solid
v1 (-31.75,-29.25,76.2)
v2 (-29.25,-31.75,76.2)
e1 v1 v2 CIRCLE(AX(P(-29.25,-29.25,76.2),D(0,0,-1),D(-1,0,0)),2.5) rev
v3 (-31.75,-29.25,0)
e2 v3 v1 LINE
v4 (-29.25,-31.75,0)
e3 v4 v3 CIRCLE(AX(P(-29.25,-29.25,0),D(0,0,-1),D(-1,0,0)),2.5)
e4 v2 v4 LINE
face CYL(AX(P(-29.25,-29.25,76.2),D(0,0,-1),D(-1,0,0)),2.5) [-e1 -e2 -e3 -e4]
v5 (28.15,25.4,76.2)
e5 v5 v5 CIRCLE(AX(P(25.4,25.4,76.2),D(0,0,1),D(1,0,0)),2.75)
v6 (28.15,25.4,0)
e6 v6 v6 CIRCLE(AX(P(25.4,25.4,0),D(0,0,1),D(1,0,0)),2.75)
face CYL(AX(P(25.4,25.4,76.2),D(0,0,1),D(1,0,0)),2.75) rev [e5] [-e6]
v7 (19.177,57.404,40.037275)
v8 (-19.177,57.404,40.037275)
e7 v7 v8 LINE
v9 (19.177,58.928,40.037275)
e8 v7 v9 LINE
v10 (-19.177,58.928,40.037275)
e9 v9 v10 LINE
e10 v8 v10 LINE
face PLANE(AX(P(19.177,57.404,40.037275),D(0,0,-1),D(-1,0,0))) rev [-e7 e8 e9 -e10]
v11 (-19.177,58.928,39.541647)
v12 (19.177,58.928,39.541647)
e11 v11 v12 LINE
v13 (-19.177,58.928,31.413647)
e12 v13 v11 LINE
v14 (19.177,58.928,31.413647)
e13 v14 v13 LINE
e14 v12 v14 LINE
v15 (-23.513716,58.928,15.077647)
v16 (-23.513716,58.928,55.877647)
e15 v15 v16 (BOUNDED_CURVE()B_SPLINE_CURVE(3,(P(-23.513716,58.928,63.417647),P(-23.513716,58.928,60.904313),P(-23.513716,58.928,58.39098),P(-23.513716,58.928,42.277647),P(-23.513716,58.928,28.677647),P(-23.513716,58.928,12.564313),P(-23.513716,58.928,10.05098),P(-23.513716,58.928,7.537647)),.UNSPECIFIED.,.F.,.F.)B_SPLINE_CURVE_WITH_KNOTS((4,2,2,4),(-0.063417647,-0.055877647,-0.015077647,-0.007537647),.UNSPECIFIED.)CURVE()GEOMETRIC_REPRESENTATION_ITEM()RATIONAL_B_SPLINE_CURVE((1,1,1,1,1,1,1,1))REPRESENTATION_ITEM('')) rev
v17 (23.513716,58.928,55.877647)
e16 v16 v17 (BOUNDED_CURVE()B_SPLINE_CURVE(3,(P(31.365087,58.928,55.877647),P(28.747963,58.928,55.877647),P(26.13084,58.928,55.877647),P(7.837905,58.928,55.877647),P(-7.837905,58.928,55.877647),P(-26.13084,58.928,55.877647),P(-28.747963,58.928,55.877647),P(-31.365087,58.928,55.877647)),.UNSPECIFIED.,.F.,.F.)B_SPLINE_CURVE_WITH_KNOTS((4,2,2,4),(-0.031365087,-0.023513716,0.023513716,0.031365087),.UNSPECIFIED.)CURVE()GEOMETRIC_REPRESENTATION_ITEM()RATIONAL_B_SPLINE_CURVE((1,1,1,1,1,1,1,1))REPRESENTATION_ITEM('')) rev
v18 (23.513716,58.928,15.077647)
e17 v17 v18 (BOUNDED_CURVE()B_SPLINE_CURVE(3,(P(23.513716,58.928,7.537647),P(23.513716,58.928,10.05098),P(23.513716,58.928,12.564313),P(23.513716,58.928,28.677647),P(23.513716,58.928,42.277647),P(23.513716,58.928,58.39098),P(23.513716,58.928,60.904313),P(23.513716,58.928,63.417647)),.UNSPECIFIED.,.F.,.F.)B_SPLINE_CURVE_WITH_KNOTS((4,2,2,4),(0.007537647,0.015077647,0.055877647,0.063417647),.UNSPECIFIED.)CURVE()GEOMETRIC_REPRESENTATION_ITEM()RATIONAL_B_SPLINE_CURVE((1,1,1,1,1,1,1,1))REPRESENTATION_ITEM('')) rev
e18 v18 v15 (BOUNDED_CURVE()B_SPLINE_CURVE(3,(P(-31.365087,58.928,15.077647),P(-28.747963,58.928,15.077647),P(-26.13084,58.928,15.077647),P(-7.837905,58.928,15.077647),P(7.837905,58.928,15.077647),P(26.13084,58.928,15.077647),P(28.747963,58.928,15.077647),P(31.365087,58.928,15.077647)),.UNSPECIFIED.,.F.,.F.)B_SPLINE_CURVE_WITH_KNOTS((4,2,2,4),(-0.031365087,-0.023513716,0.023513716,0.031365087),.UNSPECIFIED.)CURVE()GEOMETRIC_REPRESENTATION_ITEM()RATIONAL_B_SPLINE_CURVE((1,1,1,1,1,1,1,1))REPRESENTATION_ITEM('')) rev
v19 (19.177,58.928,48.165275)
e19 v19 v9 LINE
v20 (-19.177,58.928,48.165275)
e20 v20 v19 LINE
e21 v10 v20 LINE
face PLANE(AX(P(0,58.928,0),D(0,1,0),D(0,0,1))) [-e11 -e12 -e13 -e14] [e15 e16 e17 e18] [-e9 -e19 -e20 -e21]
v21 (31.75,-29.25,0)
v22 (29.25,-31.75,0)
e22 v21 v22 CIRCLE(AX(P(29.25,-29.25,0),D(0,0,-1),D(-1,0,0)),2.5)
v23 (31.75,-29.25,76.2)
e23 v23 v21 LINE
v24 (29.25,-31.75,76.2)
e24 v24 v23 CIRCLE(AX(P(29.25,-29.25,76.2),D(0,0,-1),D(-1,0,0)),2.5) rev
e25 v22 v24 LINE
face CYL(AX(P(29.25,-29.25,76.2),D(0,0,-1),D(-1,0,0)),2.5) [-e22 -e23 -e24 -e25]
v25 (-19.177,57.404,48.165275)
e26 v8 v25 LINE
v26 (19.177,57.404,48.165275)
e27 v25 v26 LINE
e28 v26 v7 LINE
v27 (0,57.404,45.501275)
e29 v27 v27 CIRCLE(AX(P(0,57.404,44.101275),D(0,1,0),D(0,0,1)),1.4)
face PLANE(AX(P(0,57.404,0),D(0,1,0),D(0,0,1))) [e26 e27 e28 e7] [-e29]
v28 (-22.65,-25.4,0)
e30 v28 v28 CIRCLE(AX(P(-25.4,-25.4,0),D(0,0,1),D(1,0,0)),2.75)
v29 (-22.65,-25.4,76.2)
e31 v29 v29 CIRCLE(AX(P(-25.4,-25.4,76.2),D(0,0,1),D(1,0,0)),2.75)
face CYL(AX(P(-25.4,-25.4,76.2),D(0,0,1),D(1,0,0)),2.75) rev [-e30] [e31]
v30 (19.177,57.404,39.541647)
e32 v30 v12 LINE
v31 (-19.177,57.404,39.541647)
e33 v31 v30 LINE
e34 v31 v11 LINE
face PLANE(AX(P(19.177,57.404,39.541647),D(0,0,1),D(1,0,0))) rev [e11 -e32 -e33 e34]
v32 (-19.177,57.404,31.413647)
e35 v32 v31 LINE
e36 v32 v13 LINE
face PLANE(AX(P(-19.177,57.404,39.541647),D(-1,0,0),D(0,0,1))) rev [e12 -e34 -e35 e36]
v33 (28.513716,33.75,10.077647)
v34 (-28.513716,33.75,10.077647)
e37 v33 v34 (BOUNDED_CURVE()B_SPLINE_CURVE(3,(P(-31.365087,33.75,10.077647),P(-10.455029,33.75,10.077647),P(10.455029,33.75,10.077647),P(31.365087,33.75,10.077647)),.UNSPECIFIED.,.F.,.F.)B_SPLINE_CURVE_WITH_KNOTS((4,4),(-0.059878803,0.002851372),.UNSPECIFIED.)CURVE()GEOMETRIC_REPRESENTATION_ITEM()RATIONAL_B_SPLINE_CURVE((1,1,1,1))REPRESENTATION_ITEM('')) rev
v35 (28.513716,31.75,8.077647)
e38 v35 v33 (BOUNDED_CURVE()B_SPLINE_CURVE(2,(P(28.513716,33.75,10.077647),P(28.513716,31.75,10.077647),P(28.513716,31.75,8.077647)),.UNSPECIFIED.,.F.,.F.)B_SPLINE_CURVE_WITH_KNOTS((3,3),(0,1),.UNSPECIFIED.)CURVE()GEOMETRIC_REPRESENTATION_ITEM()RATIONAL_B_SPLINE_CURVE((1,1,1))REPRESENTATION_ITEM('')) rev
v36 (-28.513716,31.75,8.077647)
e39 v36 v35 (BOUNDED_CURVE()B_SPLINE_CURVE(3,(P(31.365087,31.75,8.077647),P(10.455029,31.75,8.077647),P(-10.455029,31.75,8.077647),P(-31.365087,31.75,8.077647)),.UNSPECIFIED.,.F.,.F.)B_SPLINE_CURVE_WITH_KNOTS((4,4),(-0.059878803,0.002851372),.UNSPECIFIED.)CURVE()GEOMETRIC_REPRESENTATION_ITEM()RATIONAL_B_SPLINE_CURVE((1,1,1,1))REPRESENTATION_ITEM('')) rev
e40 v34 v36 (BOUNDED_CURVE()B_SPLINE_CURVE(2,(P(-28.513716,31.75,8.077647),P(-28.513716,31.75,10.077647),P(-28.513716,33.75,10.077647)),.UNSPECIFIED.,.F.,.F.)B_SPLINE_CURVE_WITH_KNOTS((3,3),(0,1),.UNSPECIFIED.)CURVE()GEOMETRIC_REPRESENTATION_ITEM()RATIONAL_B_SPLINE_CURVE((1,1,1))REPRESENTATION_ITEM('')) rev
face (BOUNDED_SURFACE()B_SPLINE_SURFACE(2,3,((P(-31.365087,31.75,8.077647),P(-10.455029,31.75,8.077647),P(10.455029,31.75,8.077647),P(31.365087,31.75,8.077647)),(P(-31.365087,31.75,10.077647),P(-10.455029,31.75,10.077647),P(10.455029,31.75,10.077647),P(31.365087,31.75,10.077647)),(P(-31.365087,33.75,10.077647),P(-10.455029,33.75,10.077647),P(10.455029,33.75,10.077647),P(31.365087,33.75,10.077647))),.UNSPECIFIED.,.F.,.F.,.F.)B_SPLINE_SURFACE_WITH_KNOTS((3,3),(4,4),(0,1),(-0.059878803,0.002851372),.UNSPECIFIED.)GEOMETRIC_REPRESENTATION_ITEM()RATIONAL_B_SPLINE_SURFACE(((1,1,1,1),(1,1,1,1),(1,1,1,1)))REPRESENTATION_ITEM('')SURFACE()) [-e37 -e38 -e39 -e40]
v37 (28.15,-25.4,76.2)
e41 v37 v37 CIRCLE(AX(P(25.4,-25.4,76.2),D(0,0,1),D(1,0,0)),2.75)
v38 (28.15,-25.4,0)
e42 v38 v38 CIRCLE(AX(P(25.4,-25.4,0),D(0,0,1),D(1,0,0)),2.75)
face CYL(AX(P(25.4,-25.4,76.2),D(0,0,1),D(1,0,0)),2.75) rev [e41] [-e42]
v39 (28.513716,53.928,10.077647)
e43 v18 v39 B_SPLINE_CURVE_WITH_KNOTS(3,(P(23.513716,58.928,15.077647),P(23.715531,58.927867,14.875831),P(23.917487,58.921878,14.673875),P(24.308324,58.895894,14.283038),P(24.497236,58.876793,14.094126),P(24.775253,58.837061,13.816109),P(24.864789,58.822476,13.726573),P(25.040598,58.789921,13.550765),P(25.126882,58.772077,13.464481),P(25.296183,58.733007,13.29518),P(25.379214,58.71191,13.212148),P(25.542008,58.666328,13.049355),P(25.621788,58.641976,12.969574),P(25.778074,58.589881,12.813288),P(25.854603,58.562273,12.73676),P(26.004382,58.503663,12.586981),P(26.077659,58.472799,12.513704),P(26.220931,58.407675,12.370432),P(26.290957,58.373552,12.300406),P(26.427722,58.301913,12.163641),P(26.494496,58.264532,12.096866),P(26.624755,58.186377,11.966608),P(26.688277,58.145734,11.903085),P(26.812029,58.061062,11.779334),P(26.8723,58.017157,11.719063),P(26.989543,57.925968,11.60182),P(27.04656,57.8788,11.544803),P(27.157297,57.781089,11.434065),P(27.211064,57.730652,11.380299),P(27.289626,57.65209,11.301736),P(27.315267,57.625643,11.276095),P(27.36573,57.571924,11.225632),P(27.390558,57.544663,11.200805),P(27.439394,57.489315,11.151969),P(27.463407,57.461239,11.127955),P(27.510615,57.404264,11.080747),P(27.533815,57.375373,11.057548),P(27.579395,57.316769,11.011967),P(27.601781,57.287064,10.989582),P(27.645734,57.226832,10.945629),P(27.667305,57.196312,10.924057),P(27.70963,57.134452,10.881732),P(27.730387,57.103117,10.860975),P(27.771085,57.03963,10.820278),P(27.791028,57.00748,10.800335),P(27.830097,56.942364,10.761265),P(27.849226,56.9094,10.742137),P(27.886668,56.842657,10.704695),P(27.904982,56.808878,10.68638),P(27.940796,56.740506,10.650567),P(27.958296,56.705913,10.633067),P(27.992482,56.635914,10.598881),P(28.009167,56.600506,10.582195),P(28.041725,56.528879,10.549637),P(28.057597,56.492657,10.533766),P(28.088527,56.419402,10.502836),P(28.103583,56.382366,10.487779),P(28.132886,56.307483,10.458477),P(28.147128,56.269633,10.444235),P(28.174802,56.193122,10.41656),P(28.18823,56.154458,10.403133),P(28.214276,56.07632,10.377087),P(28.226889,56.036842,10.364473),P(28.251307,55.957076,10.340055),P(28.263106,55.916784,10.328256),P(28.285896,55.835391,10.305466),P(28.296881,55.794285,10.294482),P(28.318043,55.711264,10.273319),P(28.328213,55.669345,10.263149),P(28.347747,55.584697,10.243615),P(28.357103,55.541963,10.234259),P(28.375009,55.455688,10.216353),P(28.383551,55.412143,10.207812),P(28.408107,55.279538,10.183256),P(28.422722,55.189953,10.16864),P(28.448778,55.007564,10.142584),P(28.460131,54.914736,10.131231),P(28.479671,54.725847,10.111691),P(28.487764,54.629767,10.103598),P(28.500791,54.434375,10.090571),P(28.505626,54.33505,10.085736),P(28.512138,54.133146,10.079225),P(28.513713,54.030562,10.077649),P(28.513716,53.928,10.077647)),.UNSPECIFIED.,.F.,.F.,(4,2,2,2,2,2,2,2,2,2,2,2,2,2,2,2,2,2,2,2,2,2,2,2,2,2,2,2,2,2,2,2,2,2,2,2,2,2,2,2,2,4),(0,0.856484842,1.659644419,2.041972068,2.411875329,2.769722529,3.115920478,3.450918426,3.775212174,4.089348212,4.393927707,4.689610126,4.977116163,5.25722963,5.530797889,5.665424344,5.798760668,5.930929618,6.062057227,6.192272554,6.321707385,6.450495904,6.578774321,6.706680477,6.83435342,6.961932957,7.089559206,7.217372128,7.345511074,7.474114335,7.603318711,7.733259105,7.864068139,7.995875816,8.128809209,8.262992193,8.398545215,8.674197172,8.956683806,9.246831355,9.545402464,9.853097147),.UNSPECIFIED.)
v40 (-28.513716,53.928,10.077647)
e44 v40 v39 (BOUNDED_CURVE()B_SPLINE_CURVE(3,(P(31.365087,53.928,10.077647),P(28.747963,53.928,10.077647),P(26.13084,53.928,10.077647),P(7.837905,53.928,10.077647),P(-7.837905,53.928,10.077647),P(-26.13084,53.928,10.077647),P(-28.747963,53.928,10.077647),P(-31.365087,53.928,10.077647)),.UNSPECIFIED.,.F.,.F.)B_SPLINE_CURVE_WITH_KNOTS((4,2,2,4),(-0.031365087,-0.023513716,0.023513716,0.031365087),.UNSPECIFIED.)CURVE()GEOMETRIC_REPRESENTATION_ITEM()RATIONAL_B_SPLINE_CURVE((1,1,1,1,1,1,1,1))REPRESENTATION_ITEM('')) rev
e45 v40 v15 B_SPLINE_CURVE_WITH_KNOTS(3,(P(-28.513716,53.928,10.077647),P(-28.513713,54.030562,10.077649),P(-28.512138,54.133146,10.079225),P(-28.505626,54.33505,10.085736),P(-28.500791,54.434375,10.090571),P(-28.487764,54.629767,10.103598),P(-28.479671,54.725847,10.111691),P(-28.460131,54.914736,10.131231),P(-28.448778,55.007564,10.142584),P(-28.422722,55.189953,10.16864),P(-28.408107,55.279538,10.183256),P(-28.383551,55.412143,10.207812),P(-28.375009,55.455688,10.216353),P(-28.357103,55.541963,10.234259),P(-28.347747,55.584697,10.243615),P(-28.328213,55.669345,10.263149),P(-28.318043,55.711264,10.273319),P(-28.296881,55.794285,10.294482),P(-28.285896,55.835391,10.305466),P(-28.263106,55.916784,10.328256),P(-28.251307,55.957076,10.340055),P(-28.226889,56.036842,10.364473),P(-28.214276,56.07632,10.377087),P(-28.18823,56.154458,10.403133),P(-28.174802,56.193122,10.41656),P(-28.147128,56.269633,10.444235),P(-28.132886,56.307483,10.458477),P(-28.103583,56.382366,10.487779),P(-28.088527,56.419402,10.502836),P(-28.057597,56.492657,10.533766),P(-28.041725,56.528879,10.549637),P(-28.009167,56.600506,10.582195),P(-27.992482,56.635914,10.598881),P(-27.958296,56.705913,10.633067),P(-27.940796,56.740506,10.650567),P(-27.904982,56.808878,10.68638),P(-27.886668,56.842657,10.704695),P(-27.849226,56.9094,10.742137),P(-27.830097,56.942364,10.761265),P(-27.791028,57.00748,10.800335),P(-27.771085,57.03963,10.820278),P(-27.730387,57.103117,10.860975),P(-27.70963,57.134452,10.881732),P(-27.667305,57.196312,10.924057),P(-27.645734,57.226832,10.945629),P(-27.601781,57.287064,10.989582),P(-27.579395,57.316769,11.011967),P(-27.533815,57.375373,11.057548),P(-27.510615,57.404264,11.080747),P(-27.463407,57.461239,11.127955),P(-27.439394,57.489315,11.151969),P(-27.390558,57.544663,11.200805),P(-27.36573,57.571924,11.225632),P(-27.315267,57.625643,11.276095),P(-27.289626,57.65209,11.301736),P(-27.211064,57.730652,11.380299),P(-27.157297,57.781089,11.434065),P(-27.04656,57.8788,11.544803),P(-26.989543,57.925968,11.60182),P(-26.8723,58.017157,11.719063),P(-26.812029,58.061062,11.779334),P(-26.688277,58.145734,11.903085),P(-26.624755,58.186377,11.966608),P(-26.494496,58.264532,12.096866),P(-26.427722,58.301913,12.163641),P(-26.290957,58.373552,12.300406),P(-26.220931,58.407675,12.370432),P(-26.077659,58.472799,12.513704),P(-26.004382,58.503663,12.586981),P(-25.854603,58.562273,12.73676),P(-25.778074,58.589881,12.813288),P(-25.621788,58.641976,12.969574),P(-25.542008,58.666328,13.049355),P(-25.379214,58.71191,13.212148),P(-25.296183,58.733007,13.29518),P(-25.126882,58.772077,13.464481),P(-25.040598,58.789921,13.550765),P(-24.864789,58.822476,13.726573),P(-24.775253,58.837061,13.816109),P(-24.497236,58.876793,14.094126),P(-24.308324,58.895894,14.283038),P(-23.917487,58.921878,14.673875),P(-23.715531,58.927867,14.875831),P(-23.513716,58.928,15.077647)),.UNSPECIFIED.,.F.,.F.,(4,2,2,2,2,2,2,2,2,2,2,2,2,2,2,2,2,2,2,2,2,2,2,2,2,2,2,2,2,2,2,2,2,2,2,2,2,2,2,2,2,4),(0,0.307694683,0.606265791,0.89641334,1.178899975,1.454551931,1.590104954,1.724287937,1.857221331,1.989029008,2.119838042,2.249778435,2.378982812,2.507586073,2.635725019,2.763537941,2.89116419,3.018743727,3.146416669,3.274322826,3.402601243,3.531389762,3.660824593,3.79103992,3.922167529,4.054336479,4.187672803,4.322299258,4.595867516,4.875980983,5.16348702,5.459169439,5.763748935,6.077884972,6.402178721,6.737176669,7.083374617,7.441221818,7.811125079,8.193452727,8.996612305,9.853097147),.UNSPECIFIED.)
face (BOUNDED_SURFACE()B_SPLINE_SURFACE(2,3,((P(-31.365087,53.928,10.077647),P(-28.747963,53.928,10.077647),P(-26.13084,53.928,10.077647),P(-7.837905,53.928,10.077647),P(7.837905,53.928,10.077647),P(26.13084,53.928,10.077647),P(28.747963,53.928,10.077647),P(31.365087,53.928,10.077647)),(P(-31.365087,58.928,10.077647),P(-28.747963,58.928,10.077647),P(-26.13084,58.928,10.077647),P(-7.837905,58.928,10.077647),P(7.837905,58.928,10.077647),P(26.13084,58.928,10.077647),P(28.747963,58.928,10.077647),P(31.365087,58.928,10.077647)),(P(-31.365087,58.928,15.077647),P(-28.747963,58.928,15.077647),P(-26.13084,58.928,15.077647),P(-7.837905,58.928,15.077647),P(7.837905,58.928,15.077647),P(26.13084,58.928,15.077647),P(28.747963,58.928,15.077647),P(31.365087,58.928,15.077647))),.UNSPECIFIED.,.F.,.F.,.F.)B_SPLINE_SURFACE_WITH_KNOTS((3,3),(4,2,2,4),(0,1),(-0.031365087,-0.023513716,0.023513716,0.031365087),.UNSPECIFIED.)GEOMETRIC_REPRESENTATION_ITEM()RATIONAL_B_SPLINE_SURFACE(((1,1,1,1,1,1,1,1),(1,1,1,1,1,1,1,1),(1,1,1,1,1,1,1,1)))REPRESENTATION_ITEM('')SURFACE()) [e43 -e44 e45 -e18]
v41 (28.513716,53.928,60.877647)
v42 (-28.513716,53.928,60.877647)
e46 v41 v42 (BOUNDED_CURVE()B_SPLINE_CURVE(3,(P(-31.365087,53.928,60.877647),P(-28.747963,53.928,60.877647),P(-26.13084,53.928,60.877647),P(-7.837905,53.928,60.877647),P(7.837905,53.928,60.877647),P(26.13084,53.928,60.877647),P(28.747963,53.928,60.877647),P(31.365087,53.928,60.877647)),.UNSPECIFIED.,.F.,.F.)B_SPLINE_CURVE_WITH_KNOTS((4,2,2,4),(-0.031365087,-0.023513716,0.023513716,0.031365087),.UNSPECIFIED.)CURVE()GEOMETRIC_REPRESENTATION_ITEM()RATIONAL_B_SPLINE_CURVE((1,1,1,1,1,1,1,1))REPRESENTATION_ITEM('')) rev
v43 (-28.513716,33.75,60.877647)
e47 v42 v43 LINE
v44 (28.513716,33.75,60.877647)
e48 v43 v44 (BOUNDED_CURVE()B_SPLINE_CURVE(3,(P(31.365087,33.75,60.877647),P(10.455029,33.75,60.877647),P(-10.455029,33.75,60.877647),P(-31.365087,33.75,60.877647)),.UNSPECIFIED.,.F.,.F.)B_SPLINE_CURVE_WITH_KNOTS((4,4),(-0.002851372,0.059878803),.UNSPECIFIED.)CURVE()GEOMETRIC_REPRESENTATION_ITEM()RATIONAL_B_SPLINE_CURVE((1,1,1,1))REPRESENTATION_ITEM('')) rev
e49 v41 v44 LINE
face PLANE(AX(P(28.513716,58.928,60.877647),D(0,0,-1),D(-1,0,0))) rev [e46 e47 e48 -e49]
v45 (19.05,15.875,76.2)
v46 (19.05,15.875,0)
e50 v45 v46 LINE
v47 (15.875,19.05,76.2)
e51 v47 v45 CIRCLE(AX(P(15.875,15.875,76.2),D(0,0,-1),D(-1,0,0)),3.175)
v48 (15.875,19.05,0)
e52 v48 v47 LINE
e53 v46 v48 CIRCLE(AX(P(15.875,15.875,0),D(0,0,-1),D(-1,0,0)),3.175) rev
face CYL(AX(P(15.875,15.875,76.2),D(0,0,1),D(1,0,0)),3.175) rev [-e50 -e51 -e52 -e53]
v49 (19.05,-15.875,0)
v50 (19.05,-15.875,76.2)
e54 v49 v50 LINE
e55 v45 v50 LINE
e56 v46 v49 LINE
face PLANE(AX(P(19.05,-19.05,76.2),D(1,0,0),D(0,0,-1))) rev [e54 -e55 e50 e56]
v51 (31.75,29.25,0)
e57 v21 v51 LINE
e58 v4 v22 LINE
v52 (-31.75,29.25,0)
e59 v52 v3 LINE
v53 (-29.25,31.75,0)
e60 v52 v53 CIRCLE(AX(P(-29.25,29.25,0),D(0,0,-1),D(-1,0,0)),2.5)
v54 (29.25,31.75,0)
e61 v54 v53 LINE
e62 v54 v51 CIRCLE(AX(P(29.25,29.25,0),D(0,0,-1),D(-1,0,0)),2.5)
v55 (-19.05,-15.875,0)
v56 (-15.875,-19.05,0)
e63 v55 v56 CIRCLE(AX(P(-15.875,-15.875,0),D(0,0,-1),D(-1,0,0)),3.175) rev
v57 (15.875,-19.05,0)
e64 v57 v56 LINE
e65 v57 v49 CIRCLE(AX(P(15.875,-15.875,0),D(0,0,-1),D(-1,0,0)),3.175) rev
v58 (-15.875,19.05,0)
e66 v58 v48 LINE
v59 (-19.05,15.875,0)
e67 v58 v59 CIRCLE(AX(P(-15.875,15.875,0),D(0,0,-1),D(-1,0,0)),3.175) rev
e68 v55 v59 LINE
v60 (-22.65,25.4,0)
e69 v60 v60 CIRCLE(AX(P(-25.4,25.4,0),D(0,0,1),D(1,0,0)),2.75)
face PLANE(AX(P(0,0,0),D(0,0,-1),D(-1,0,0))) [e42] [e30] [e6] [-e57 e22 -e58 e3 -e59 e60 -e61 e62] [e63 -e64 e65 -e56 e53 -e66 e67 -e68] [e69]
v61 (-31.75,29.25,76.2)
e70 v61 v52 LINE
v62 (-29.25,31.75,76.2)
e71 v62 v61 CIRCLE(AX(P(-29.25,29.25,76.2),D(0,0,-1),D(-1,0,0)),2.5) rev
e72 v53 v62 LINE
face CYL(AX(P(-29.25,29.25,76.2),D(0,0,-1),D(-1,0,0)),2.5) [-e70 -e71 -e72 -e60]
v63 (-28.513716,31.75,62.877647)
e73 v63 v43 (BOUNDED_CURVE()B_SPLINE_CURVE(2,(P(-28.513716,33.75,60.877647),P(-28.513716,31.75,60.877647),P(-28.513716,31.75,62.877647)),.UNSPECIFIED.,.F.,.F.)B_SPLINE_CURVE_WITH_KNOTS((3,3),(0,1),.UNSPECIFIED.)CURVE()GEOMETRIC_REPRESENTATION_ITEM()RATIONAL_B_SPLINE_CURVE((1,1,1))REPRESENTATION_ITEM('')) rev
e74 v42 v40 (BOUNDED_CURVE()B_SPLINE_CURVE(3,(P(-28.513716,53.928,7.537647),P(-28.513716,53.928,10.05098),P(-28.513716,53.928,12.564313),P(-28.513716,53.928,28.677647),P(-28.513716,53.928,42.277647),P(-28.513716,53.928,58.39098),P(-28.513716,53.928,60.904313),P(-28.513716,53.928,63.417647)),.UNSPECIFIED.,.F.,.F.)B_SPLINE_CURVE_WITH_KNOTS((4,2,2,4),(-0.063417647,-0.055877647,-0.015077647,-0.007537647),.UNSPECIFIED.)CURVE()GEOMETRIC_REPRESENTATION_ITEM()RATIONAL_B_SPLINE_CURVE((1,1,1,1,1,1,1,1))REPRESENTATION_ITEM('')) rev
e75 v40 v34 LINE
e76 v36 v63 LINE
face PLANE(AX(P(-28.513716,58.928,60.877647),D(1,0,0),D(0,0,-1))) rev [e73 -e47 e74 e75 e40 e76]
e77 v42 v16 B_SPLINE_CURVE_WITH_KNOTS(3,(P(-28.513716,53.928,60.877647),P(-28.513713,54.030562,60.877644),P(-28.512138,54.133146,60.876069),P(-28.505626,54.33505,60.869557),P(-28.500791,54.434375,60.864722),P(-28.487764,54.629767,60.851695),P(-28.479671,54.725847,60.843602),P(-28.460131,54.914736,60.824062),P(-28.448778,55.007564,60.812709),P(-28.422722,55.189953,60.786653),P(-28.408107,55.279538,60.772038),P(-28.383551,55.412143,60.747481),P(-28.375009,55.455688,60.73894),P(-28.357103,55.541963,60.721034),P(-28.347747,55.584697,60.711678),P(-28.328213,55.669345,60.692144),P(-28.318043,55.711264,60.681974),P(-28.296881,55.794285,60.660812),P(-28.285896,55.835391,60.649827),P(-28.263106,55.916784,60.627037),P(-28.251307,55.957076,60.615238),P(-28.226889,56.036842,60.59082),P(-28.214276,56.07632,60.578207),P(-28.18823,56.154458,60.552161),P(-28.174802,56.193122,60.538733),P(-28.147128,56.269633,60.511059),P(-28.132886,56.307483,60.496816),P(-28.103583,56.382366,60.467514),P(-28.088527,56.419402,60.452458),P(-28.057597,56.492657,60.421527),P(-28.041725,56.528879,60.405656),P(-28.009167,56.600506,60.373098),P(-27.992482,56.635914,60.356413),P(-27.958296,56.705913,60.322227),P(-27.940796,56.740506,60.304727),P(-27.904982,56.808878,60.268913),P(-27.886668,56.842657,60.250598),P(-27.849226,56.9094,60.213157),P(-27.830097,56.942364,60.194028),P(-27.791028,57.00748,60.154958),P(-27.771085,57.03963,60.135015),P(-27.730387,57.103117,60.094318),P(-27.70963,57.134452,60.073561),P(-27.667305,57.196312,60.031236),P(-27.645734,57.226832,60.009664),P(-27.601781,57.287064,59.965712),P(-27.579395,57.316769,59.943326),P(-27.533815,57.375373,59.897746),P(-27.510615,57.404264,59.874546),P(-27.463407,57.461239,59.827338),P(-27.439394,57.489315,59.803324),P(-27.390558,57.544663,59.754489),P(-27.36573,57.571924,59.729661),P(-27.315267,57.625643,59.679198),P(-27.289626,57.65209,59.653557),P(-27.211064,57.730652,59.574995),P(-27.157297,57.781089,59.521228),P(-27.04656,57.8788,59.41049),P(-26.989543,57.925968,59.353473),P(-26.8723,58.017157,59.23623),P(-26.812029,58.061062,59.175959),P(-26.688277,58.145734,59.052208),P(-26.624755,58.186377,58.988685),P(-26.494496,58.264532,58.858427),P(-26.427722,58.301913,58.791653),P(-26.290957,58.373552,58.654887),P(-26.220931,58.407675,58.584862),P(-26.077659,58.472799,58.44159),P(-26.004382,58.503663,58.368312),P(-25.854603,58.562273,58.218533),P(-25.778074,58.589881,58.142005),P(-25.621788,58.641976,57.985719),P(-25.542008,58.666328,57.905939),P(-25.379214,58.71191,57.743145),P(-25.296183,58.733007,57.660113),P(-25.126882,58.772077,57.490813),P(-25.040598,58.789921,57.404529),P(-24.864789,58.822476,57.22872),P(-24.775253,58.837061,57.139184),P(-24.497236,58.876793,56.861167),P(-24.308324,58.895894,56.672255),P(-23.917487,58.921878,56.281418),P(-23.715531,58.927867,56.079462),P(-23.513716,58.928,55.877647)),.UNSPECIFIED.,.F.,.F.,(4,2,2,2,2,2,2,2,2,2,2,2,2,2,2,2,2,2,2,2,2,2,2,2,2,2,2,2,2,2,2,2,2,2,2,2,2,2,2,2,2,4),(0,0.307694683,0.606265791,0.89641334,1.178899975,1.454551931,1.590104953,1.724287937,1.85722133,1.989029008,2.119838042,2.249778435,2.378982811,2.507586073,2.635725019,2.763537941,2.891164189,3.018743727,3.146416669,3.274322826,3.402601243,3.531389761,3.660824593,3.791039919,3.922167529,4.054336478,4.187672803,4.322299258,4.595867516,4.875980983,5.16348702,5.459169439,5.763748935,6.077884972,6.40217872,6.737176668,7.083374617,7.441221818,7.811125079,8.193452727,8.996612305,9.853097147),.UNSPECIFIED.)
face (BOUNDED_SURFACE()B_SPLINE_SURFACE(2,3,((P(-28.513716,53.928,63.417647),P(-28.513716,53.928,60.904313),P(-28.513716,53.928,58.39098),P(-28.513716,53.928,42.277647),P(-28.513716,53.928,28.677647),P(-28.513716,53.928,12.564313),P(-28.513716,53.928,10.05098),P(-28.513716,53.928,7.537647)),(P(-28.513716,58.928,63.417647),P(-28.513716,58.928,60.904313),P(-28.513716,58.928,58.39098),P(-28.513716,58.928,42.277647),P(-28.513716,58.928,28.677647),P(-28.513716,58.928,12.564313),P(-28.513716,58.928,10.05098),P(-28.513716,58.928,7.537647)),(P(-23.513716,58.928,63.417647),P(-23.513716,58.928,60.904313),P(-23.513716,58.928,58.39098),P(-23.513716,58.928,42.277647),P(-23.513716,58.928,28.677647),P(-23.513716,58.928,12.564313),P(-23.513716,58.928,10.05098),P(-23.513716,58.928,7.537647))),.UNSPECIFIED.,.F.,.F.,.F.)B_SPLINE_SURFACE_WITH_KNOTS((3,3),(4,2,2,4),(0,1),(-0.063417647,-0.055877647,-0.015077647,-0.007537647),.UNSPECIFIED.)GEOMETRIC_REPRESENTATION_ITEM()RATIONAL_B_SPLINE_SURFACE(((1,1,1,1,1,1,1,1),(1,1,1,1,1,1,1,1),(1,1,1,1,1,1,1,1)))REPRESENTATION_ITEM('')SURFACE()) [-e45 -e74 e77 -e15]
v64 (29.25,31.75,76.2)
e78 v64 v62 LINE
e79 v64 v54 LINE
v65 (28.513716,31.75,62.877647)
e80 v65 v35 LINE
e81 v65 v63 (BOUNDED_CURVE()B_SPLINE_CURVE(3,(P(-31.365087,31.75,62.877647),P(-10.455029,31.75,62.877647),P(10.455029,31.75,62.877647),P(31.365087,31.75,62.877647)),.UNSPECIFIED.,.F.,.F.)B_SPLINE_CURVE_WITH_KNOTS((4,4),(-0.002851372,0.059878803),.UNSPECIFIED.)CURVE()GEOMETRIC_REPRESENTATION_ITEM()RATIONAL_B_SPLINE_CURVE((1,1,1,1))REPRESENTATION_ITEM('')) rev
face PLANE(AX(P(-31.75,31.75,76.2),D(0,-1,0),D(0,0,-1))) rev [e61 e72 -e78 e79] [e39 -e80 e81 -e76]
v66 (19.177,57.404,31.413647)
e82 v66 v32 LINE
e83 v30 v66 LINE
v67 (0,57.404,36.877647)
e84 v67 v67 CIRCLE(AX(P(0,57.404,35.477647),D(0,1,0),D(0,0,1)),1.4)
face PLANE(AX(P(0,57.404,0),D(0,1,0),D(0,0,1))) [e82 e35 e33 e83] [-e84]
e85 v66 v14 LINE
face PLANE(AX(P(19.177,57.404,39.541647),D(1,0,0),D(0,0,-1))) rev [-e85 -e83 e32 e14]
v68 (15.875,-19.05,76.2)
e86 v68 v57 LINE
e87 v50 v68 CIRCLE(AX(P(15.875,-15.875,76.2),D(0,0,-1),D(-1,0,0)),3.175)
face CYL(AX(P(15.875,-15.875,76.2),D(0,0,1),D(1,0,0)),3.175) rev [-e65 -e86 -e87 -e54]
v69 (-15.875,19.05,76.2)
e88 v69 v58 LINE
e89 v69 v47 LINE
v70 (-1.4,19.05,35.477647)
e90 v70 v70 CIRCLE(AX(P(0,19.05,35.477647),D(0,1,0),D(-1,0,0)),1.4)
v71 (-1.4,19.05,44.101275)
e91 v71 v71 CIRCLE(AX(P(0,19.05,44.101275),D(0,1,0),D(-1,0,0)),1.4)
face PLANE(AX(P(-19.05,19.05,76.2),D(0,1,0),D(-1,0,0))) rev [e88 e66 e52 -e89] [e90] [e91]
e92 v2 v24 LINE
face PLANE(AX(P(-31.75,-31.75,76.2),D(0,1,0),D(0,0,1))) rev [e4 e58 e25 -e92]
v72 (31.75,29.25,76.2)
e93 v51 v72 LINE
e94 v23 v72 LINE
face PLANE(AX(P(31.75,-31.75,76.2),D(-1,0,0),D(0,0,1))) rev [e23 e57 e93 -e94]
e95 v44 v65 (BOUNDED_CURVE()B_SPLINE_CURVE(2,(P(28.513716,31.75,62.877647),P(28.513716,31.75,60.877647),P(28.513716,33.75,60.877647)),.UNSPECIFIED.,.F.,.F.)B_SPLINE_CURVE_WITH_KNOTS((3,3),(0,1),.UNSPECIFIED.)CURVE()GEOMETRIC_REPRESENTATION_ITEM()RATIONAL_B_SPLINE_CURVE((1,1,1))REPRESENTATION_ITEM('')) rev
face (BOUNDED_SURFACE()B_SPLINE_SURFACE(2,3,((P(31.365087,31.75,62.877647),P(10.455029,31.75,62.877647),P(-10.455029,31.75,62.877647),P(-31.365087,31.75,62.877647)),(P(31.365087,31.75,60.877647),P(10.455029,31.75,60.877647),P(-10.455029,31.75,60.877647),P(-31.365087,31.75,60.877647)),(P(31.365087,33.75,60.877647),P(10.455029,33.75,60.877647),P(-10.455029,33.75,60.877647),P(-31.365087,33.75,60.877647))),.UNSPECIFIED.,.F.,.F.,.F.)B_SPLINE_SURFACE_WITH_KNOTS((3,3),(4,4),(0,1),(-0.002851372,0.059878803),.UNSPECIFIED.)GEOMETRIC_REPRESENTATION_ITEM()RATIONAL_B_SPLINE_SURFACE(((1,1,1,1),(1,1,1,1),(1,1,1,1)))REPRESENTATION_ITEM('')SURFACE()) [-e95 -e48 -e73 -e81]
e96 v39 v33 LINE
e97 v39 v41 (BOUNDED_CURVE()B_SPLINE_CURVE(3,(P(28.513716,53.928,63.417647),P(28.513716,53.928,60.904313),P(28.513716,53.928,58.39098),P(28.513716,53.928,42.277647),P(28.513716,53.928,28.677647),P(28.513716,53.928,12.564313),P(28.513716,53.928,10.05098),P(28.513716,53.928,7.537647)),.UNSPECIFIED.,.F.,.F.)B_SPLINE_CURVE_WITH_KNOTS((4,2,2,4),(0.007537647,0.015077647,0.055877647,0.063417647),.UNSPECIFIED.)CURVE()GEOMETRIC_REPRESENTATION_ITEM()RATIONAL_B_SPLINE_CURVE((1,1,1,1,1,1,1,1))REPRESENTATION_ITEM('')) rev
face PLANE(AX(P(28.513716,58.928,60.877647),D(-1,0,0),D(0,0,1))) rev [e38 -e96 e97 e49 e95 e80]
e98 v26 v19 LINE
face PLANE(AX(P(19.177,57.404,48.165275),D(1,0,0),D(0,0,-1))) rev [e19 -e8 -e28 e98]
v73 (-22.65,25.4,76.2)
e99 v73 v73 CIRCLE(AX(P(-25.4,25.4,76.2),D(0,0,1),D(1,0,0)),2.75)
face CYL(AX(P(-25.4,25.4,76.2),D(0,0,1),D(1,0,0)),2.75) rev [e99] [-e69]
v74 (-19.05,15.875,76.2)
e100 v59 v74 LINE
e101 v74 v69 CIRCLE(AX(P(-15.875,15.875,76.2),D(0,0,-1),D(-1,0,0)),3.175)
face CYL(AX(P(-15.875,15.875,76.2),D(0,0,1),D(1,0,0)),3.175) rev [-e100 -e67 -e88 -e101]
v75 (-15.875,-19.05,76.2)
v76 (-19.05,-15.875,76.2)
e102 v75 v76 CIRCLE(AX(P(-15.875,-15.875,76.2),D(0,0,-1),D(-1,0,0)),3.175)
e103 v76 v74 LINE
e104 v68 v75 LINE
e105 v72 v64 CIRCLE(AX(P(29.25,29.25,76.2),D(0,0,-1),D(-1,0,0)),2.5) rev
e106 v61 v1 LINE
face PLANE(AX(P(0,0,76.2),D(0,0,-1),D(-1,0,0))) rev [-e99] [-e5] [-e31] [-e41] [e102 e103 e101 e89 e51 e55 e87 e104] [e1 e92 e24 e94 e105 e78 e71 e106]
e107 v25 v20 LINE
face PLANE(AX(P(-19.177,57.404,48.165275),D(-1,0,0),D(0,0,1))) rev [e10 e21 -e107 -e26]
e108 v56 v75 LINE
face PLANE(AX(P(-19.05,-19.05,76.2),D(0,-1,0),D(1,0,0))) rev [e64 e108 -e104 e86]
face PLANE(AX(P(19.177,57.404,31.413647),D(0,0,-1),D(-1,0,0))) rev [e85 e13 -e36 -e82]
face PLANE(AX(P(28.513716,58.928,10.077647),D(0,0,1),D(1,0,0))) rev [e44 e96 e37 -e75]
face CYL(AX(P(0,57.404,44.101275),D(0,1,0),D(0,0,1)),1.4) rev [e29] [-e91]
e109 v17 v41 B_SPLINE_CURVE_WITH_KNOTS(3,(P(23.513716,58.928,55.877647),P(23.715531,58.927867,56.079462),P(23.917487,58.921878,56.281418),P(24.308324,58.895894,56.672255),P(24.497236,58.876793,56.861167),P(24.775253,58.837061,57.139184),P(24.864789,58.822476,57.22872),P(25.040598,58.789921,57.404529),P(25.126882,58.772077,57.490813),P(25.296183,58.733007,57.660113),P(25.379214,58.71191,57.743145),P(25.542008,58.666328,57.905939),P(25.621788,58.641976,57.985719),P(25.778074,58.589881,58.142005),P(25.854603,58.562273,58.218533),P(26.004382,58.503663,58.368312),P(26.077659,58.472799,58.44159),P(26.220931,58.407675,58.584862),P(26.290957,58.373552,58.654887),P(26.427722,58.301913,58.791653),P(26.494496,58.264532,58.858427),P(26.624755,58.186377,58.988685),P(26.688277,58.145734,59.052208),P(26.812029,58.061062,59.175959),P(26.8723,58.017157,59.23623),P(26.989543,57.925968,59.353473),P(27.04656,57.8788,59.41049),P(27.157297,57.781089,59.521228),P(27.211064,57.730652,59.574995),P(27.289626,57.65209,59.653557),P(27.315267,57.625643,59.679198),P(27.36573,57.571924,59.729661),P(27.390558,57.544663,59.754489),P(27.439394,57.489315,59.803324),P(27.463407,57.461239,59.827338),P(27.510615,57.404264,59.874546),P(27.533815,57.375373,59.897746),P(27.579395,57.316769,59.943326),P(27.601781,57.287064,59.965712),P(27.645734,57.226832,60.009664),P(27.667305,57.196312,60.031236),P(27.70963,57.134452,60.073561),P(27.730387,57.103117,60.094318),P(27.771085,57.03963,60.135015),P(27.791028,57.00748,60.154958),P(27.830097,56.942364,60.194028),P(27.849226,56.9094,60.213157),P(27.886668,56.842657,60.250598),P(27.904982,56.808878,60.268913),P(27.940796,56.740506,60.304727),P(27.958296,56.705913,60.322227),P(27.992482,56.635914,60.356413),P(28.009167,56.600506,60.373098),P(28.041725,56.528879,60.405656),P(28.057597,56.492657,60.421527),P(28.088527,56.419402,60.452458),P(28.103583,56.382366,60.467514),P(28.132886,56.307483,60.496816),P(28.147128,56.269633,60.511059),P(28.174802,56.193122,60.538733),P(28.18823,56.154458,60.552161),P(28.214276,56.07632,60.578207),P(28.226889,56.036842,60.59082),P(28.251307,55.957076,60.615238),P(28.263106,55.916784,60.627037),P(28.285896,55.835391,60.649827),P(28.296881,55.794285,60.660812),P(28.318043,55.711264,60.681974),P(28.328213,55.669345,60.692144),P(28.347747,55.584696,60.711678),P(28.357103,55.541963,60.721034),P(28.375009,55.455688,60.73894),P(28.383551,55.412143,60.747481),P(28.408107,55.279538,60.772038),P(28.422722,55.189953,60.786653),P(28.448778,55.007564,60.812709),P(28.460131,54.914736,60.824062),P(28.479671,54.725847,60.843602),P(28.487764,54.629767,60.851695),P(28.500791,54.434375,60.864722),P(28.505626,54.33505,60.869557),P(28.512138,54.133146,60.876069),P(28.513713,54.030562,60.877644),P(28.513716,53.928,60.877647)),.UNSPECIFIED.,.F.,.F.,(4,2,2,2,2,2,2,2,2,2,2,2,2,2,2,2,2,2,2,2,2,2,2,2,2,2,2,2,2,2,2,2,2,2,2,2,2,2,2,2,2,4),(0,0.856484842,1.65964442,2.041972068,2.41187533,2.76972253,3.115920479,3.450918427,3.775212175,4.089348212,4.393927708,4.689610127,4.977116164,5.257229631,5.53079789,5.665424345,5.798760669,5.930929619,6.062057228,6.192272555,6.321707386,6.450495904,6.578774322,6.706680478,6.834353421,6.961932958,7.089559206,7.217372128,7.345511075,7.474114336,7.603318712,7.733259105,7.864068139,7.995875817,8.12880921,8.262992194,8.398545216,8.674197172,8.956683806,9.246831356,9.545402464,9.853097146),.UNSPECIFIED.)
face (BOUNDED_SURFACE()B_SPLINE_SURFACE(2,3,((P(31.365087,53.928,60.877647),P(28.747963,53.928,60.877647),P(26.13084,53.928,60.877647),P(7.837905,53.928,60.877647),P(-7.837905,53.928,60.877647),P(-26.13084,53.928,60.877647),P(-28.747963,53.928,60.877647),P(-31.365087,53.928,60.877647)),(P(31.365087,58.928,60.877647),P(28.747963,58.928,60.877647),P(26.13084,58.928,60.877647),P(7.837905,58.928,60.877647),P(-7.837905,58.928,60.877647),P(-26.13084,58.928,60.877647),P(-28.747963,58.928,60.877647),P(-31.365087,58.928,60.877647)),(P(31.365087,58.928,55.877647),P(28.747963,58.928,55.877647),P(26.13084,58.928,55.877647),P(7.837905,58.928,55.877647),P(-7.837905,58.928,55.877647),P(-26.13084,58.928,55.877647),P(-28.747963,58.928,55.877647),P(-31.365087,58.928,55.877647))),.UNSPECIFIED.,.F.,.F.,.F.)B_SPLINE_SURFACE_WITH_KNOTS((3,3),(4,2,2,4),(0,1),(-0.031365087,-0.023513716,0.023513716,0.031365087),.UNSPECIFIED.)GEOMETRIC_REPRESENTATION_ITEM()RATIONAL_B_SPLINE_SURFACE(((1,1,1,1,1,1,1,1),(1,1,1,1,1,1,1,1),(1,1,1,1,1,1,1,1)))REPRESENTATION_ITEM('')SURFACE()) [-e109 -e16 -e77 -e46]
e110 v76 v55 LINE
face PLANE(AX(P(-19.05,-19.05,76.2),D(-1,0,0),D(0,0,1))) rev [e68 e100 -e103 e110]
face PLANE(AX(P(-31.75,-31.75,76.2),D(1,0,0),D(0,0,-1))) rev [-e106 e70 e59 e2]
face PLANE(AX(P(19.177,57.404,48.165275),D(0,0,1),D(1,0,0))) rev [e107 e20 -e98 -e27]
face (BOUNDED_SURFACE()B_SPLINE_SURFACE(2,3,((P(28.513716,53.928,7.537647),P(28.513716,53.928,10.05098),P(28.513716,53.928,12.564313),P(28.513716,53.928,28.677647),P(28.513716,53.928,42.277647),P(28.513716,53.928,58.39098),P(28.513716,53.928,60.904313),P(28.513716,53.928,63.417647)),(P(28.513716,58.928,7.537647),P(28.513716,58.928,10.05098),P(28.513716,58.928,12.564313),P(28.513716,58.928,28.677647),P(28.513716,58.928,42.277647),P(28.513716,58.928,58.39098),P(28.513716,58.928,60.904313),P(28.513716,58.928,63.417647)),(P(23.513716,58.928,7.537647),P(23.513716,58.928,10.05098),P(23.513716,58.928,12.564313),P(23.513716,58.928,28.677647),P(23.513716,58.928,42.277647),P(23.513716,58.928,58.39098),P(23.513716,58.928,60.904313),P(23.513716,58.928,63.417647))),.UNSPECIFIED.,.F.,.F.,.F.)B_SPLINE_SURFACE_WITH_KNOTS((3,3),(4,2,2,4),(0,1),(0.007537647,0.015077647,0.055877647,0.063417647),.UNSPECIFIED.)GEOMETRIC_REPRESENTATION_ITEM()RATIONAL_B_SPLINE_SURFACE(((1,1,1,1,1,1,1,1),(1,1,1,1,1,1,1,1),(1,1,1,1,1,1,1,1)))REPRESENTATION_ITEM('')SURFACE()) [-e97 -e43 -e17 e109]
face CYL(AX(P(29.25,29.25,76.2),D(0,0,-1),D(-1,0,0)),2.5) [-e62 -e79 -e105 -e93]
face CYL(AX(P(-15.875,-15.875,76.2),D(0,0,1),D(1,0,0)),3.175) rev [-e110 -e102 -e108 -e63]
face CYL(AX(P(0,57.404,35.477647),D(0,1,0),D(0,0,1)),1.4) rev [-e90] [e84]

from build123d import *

# Parameters (mm, degrees)
SKETCH1_W                = 63.5
SKETCH1_H                = 63.5
BOSS_EXTRUDE1_DEPTH      = 76.2
M5_CLEARANCE_HOLE1_D     = 5.5
SKETCH4_W                = 38.1
SKETCH4_H                = 38.1
CUT_EXTRUDE1_DEPTH       = 89.44526556
FILLET1_R                = 2.5
FILLET2_R                = 3.175
SKETCH5_W                = 57.027431562
SKETCH5_H                = 50.8
BOSS_EXTRUDE2_DEPTH      = 27.178
SKETCH7_W                = 38.354
SKETCH7_H                = 8.128
CUT_EXTRUDE2_DEPTH       = 1.524
M3_CLEARANCE_HOLE1_D     = 2.8
M3_CLEARANCE_HOLE1_DEPTH = 38.354
FILLET3_SIZE             = 5
FILLET4_SIZE             = 2
FILLET5_SIZE             = 2


with BuildPart() as part:
    # Sketch1 → Boss-Extrude1 (new body)
    with BuildSketch(Plane.XY):
        Rectangle(SKETCH1_W, SKETCH1_H)
    extrude(amount=BOSS_EXTRUDE1_DEPTH)

    # M5 Clearance Hole1 (through all)
    with Locations(Plane.XY.offset(76.2)):
        with Locations((25.4, -25.4), (25.4, 25.4), (-25.4, -25.4), (-25.4, 25.4)):
            Hole(M5_CLEARANCE_HOLE1_D / 2)

    # Sketch4 → Cut-Extrude1 (cut, through all)
    with BuildSketch(Plane(origin=(0, 0, 0), x_dir=(-1, 0, 0), z_dir=(0, 0, -1))):
        Rectangle(SKETCH4_W, SKETCH4_H)
    extrude(amount=-CUT_EXTRUDE1_DEPTH, mode=Mode.SUBTRACT)

    # Fillet1
    fillet1_edges = [part.edges().sort_by_distance(p)[0] for p in [
        (31.75, -31.75, 38.1),
        (-31.75, -31.75, 38.1),
        (-31.75, 31.75, 38.1),
        (31.75, 31.75, 38.1),
    ]]
    fillet(fillet1_edges, radius=FILLET1_R)

    # Fillet2
    fillet2_edges = [part.edges().sort_by_distance(p)[0] for p in [
        (19.05, -19.05, 38.1),
        (19.05, 19.05, 38.1),
        (-19.05, 19.05, 38.1),
        (-19.05, -19.05, 38.1),
    ]]
    fillet(fillet2_edges, radius=FILLET2_R)

    # Sketch5 → Boss-Extrude2 (add)
    with BuildSketch(Plane(origin=(0, 31.75, 0), x_dir=(1, 0, 0), z_dir=(0, 1, 0))):
        with Locations((0, -35.47764662)):
            Rectangle(SKETCH5_W, SKETCH5_H)
    extrude(amount=BOSS_EXTRUDE2_DEPTH)

    # Sketch7 → Cut-Extrude2 (cut)
    with BuildSketch(Plane(origin=(0, 58.928, 0), x_dir=(1, 0, 0), z_dir=(0, 1, 0))):
        with Locations((-274.796433557, 103.138535486)):
            Rectangle(SKETCH7_W, SKETCH7_H)
        with Locations((0, -35.47764662)):
            Rectangle(SKETCH7_W, SKETCH7_H)
        with Locations((0, -44.101274776)):
            Rectangle(SKETCH7_W, SKETCH7_H)
    extrude(amount=-CUT_EXTRUDE2_DEPTH, mode=Mode.SUBTRACT)

    # M3 Clearance Hole1
    with Locations(Plane(origin=(0, 57.404, 0), x_dir=(1, 0, 0), z_dir=(0, 1, 0))):
        with Locations((0, -44.101274776), (0, -35.47764662)):
            Hole(M3_CLEARANCE_HOLE1_D / 2, depth=M3_CLEARANCE_HOLE1_DEPTH)

    # Fillet3
    # a fillet whose section is not a circle: 5 mm, written as the material it takes off along each edge
    with BuildSketch(Plane(origin=(-41.013715781, 58.928, 10.07764662), x_dir=(0, -1, 0), z_dir=(1, 0, 0)), Plane(origin=(41.013715781, 58.928, 60.87764662), x_dir=(0, -1, 0), z_dir=(-1, 0, 0))) as fillet3_piece_1:
        with BuildLine():
            Bezier((FILLET3_SIZE, 0), (0, 0), (0, -FILLET3_SIZE), weights=[1, 1, 1])
            Line((0, -FILLET3_SIZE), (0, 0))
            Line((0, 0), (FILLET3_SIZE, 0))
        make_face()
    extrude(amount=82.027431561, mode=Mode.SUBTRACT)
    with BuildSketch(Plane(origin=(28.513715781, 58.928, -2.42235338), x_dir=(0, -1, 0), z_dir=(0, 0, 1)), Plane(origin=(-28.513715781, 58.928, 73.37764662), x_dir=(0, -1, 0), z_dir=(0, 0, -1))) as fillet3_piece_2:
        with BuildLine():
            Bezier((FILLET3_SIZE, 0), (0, 0), (0, -FILLET3_SIZE), weights=[1, 1, 1])
            Line((0, -FILLET3_SIZE), (0, 0))
            Line((0, 0), (FILLET3_SIZE, 0))
        make_face()
    extrude(amount=75.8, mode=Mode.SUBTRACT)

    # Fillet4
    # a fillet whose section is not a circle: 2 mm, written as the material it adds along each edge
    with BuildSketch(Plane(origin=(28.513715781, 31.75, 60.87764662), x_dir=(0, 0, 1), z_dir=(-1, 0, 0))) as fillet4_piece_1:
        with BuildLine():
            Bezier((FILLET4_SIZE, 0), (0, 0), (0, FILLET4_SIZE), weights=[1, 1, 1])
            Line((0, FILLET4_SIZE), (0, 0))
            Line((0, 0), (FILLET4_SIZE, 0))
        make_face()
    extrude(amount=57.027431561)

    # Fillet5
    # a fillet whose section is not a circle: 2 mm, written as the material it adds along each edge
    with BuildSketch(Plane(origin=(-28.513715781, 31.75, 10.07764662), x_dir=(0, 1, 0), z_dir=(1, 0, 0))) as fillet5_piece_1:
        with BuildLine():
            Bezier((FILLET5_SIZE, 0), (0, 0), (0, -FILLET5_SIZE), weights=[1, 1, 1])
            Line((0, -FILLET5_SIZE), (0, 0))
            Line((0, 0), (FILLET5_SIZE, 0))
        make_face()
    extrude(amount=57.027431561)


solid = part.part
